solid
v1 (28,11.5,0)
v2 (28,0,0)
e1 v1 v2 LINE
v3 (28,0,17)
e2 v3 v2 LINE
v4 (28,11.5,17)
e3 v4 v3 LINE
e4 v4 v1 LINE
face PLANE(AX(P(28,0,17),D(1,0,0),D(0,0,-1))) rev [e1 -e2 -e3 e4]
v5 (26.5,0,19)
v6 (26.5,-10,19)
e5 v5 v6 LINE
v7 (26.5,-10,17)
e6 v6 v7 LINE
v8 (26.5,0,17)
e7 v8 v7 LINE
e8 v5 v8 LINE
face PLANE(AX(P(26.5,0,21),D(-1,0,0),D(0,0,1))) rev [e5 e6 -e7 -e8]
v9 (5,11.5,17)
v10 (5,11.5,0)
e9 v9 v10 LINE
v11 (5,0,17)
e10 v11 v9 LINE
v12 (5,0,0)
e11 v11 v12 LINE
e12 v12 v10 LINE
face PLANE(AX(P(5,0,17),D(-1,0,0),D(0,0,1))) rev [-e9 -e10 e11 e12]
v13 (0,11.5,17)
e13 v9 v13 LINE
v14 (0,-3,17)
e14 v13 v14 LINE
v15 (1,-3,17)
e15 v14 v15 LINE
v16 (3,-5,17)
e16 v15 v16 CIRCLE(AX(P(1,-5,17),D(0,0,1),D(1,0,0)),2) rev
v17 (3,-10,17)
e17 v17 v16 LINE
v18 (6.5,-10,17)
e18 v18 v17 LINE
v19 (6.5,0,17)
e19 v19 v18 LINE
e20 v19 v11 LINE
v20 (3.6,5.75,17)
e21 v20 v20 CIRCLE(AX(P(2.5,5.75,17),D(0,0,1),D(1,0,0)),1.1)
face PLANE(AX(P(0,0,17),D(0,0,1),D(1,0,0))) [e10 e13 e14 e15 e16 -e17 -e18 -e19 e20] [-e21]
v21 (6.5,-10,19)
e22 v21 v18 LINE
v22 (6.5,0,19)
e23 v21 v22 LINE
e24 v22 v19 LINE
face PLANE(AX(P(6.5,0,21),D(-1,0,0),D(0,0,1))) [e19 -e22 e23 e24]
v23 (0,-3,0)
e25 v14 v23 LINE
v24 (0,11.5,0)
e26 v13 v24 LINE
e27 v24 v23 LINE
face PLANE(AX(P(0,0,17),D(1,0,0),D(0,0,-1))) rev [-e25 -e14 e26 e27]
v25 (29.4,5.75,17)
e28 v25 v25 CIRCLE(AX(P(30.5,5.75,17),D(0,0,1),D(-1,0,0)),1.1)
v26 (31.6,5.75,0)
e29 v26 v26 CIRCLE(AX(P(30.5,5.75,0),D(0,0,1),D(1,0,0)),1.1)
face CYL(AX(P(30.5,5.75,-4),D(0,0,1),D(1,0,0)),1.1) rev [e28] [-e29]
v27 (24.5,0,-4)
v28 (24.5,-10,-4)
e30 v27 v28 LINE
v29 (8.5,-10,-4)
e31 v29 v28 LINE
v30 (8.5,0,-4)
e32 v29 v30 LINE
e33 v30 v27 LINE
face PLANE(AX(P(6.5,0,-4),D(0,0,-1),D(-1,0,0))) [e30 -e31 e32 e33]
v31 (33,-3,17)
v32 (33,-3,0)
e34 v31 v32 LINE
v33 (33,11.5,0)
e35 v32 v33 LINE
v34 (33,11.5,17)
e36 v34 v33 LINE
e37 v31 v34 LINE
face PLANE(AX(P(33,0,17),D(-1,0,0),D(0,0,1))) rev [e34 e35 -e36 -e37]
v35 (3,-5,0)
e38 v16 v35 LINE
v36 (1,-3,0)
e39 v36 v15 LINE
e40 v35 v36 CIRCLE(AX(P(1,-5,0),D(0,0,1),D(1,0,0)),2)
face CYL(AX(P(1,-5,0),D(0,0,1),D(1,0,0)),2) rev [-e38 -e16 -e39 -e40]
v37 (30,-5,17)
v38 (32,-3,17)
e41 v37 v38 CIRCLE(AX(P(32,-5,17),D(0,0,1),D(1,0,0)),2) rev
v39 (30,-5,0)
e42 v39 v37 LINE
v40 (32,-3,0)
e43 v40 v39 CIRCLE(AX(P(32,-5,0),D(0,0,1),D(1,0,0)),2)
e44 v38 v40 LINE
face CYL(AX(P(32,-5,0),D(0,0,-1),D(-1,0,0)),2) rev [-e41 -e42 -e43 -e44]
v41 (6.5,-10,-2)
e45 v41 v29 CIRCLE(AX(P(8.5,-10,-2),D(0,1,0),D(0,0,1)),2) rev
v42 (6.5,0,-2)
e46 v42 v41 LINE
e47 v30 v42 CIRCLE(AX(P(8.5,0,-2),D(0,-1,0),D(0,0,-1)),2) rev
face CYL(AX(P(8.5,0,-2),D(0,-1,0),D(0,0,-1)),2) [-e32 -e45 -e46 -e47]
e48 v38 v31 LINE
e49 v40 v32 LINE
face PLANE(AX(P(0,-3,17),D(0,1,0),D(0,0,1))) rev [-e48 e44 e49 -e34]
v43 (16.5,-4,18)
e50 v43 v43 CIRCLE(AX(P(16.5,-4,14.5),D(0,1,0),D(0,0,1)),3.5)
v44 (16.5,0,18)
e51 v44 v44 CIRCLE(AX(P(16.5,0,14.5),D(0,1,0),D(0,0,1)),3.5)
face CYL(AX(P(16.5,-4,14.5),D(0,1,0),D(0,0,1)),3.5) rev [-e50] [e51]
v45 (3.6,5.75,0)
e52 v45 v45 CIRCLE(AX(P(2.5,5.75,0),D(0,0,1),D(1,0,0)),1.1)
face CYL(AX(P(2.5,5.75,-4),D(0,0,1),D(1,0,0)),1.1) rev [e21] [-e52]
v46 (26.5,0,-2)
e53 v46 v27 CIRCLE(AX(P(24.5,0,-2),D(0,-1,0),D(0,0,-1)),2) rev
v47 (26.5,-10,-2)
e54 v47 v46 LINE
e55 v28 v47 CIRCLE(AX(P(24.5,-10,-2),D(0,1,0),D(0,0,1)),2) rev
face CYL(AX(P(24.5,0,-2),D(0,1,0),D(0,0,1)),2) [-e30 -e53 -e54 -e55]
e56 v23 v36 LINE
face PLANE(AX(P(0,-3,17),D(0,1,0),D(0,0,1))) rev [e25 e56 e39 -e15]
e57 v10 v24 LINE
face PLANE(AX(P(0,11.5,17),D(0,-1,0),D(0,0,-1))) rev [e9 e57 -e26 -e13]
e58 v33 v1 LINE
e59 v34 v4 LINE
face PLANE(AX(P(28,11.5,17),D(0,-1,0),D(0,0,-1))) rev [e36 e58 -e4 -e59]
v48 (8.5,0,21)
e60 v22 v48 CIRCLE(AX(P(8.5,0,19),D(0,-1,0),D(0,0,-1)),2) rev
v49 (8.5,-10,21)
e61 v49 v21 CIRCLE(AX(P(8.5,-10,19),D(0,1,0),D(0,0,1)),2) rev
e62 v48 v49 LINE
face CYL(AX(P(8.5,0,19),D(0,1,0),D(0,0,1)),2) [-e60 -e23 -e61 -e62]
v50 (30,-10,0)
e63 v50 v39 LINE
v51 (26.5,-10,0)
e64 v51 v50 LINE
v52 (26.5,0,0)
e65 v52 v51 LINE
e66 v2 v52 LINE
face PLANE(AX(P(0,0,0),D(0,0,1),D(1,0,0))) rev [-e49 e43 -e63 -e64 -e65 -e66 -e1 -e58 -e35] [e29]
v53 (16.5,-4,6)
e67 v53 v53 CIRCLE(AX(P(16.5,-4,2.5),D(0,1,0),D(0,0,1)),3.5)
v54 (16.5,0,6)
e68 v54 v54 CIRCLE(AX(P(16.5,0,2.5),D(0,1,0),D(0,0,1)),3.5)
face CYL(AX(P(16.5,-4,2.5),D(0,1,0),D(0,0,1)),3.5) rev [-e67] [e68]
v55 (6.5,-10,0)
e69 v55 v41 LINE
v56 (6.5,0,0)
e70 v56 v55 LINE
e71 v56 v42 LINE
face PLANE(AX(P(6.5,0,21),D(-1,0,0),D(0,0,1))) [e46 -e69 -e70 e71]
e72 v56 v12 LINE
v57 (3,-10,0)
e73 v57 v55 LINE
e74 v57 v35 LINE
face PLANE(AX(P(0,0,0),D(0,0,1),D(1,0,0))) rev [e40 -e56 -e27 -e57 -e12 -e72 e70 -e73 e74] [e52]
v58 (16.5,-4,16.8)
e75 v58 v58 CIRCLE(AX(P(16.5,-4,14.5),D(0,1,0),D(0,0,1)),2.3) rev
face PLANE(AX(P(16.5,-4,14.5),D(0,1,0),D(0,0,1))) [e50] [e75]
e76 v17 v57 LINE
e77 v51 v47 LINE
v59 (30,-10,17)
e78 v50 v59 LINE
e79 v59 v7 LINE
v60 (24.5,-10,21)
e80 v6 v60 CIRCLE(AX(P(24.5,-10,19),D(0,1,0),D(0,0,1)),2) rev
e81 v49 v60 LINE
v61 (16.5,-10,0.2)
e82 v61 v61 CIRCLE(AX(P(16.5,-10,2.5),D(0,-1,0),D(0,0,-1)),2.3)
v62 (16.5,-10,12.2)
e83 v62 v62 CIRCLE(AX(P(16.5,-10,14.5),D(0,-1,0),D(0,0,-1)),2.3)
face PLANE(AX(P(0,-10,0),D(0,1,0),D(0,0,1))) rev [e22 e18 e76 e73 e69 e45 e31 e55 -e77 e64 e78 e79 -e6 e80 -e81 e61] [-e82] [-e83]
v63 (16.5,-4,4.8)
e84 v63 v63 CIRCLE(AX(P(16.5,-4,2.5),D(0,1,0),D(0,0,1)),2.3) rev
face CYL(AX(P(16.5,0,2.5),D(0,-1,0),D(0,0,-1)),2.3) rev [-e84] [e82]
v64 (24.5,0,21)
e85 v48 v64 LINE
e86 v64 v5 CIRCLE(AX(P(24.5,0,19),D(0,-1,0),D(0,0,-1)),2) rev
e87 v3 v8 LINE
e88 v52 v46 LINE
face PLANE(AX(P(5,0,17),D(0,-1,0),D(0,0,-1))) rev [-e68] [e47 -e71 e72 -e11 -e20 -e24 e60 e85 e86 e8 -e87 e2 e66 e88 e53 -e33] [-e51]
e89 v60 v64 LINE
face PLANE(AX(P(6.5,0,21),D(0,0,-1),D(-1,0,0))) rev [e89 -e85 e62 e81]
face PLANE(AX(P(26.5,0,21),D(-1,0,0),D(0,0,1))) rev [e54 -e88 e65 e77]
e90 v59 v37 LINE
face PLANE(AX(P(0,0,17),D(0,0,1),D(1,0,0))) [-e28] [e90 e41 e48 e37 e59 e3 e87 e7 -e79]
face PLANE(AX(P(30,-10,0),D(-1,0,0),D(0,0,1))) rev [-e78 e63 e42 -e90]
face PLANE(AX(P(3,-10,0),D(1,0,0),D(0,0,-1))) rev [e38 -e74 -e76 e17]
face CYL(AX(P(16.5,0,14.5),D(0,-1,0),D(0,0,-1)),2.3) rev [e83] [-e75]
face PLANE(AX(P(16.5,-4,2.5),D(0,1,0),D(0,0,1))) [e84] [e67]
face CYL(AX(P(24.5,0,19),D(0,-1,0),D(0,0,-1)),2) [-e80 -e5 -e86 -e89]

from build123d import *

# Parameters (mm, degrees)
SALIENTE_EXTRUIR1_DEPTH = 17
CROQUIS4_R              = 2.5
CORTAR_EXTRUIR2_DEPTH   = 5
CROQUIS5_W              = 27
CROQUIS5_H              = 17
CROQUIS5_R              = 2.5
SALIENTE_EXTRUIR4_DEPTH = 7
REDONDEO2_R             = 2
CROQUIS6_R              = 3.5
CORTAR_EXTRUIR3_DEPTH   = 1
CROQUIS9_R              = 3.5
SALIENTE_EXTRUIR7_DEPTH = 10
CROQUIS10_W             = 20
CROQUIS10_H             = 25
SALIENTE_EXTRUIR8_DEPTH = 10
CROQUIS11_R             = 2.3
CORTAR_EXTRUIR6_DEPTH   = 10
CROQUIS12_R             = 3.5
CORTAR_EXTRUIR7_DEPTH   = 4
REDONDEO3_R             = 2
CROQUIS8_R              = 1.1
CORTAR_EXTRUIR8_DEPTH   = 41.770700264


with BuildPart() as part:
    # Croquis2 → Saliente-Extruir1 (new body)
    with BuildSketch(Plane.XY):
        Polygon((0, 0), (0, 11.5), (5, 11.5), (5, 0), (28, 0), (28, 11.5), (33, 11.5), (33, 0), (33, -3), (0, -3), align=None)
    extrude(amount=SALIENTE_EXTRUIR1_DEPTH)

    # Croquis4 → Cortar-Extruir2 (cut)
    with BuildSketch(Plane(origin=(0, 0, 0), x_dir=(1, 0, 0), z_dir=(0, 1, 0))):
        with Locations((9, -8.5)):
            Circle(CROQUIS4_R)
        with Locations((24, -8.5)):
            Circle(CROQUIS4_R)
    extrude(amount=-CORTAR_EXTRUIR2_DEPTH, mode=Mode.SUBTRACT)

    # Croquis5 → Saliente-Extruir4 (add)
    with BuildSketch(Plane.XZ.offset(3)):
        with Locations((16.5, 8.5)):
            Rectangle(CROQUIS5_W, CROQUIS5_H)
        with Locations((9, 8.5)):
            Circle(CROQUIS5_R, mode=Mode.SUBTRACT)
        with Locations((24, 8.5)):
            Circle(CROQUIS5_R, mode=Mode.SUBTRACT)
    extrude(amount=SALIENTE_EXTRUIR4_DEPTH)

    # Redondeo2
    redondeo2_edges = [part.edges().sort_by_distance(p)[0] for p in [
        (3, -3, 8.5),
        (30, -3, 8.5),
    ]]
    fillet(redondeo2_edges, radius=REDONDEO2_R)

    # Croquis6 → Cortar-Extruir3 (cut)
    with BuildSketch(Plane(origin=(0, 0, 0), x_dir=(1, 0, 0), z_dir=(0, 1, 0))):
        with Locations((9, -8.5)):
            Circle(CROQUIS6_R)
        with Locations((24, -8.5)):
            Circle(CROQUIS6_R)
    extrude(amount=-CORTAR_EXTRUIR3_DEPTH, mode=Mode.SUBTRACT)

    # Croquis9 → Saliente-Extruir7 (add)
    with BuildSketch(Plane(origin=(0, 0, 0), x_dir=(1, 0, 0), z_dir=(0, 1, 0))):
        with Locations((9, -8.5)):
            Circle(CROQUIS9_R)
        with Locations((24, -8.5)):
            Circle(CROQUIS9_R)
    extrude(amount=-SALIENTE_EXTRUIR7_DEPTH)

    # Croquis10 → Saliente-Extruir8 (add)
    with BuildSketch(Plane.XZ.offset(10)):
        with Locations((16.5, 8.5)):
            Rectangle(CROQUIS10_W, CROQUIS10_H)
    extrude(amount=-SALIENTE_EXTRUIR8_DEPTH)

    # Croquis11 → Cortar-Extruir6 (cut)
    with BuildSketch(Plane.XZ.offset(10)):
        with Locations((16.5, 14.5)):
            Circle(CROQUIS11_R)
        with Locations((16.5, 2.5)):
            Circle(CROQUIS11_R)
    extrude(amount=-CORTAR_EXTRUIR6_DEPTH, mode=Mode.SUBTRACT)

    # Croquis12 → Cortar-Extruir7 (cut)
    with BuildSketch(Plane(origin=(0, 0, 0), x_dir=(1, 0, 0), z_dir=(0, 1, 0))):
        with Locations((16.5, -2.5)):
            Circle(CROQUIS12_R)
        with Locations((16.5, -14.5)):
            Circle(CROQUIS12_R)
    extrude(amount=-CORTAR_EXTRUIR7_DEPTH, mode=Mode.SUBTRACT)

    # Redondeo3
    redondeo3_edges = [part.edges().sort_by_distance(p)[0] for p in [
        (26.5, -5, -4),
        (6.5, -5, -4),
        (6.5, -5, 21),
        (26.5, -5, 21),
    ]]
    fillet(redondeo3_edges, radius=REDONDEO3_R)

    # Croquis8 → Cortar-Extruir8 (cut, through all)
    with BuildSketch(Plane.XY.offset(17)):
        with Locations((2.5, 5.75)):
            Circle(CROQUIS8_R)
        with Locations((30.5, 5.75)):
            Circle(CROQUIS8_R)
    extrude(amount=-CORTAR_EXTRUIR8_DEPTH, mode=Mode.SUBTRACT)


solid = part.part
